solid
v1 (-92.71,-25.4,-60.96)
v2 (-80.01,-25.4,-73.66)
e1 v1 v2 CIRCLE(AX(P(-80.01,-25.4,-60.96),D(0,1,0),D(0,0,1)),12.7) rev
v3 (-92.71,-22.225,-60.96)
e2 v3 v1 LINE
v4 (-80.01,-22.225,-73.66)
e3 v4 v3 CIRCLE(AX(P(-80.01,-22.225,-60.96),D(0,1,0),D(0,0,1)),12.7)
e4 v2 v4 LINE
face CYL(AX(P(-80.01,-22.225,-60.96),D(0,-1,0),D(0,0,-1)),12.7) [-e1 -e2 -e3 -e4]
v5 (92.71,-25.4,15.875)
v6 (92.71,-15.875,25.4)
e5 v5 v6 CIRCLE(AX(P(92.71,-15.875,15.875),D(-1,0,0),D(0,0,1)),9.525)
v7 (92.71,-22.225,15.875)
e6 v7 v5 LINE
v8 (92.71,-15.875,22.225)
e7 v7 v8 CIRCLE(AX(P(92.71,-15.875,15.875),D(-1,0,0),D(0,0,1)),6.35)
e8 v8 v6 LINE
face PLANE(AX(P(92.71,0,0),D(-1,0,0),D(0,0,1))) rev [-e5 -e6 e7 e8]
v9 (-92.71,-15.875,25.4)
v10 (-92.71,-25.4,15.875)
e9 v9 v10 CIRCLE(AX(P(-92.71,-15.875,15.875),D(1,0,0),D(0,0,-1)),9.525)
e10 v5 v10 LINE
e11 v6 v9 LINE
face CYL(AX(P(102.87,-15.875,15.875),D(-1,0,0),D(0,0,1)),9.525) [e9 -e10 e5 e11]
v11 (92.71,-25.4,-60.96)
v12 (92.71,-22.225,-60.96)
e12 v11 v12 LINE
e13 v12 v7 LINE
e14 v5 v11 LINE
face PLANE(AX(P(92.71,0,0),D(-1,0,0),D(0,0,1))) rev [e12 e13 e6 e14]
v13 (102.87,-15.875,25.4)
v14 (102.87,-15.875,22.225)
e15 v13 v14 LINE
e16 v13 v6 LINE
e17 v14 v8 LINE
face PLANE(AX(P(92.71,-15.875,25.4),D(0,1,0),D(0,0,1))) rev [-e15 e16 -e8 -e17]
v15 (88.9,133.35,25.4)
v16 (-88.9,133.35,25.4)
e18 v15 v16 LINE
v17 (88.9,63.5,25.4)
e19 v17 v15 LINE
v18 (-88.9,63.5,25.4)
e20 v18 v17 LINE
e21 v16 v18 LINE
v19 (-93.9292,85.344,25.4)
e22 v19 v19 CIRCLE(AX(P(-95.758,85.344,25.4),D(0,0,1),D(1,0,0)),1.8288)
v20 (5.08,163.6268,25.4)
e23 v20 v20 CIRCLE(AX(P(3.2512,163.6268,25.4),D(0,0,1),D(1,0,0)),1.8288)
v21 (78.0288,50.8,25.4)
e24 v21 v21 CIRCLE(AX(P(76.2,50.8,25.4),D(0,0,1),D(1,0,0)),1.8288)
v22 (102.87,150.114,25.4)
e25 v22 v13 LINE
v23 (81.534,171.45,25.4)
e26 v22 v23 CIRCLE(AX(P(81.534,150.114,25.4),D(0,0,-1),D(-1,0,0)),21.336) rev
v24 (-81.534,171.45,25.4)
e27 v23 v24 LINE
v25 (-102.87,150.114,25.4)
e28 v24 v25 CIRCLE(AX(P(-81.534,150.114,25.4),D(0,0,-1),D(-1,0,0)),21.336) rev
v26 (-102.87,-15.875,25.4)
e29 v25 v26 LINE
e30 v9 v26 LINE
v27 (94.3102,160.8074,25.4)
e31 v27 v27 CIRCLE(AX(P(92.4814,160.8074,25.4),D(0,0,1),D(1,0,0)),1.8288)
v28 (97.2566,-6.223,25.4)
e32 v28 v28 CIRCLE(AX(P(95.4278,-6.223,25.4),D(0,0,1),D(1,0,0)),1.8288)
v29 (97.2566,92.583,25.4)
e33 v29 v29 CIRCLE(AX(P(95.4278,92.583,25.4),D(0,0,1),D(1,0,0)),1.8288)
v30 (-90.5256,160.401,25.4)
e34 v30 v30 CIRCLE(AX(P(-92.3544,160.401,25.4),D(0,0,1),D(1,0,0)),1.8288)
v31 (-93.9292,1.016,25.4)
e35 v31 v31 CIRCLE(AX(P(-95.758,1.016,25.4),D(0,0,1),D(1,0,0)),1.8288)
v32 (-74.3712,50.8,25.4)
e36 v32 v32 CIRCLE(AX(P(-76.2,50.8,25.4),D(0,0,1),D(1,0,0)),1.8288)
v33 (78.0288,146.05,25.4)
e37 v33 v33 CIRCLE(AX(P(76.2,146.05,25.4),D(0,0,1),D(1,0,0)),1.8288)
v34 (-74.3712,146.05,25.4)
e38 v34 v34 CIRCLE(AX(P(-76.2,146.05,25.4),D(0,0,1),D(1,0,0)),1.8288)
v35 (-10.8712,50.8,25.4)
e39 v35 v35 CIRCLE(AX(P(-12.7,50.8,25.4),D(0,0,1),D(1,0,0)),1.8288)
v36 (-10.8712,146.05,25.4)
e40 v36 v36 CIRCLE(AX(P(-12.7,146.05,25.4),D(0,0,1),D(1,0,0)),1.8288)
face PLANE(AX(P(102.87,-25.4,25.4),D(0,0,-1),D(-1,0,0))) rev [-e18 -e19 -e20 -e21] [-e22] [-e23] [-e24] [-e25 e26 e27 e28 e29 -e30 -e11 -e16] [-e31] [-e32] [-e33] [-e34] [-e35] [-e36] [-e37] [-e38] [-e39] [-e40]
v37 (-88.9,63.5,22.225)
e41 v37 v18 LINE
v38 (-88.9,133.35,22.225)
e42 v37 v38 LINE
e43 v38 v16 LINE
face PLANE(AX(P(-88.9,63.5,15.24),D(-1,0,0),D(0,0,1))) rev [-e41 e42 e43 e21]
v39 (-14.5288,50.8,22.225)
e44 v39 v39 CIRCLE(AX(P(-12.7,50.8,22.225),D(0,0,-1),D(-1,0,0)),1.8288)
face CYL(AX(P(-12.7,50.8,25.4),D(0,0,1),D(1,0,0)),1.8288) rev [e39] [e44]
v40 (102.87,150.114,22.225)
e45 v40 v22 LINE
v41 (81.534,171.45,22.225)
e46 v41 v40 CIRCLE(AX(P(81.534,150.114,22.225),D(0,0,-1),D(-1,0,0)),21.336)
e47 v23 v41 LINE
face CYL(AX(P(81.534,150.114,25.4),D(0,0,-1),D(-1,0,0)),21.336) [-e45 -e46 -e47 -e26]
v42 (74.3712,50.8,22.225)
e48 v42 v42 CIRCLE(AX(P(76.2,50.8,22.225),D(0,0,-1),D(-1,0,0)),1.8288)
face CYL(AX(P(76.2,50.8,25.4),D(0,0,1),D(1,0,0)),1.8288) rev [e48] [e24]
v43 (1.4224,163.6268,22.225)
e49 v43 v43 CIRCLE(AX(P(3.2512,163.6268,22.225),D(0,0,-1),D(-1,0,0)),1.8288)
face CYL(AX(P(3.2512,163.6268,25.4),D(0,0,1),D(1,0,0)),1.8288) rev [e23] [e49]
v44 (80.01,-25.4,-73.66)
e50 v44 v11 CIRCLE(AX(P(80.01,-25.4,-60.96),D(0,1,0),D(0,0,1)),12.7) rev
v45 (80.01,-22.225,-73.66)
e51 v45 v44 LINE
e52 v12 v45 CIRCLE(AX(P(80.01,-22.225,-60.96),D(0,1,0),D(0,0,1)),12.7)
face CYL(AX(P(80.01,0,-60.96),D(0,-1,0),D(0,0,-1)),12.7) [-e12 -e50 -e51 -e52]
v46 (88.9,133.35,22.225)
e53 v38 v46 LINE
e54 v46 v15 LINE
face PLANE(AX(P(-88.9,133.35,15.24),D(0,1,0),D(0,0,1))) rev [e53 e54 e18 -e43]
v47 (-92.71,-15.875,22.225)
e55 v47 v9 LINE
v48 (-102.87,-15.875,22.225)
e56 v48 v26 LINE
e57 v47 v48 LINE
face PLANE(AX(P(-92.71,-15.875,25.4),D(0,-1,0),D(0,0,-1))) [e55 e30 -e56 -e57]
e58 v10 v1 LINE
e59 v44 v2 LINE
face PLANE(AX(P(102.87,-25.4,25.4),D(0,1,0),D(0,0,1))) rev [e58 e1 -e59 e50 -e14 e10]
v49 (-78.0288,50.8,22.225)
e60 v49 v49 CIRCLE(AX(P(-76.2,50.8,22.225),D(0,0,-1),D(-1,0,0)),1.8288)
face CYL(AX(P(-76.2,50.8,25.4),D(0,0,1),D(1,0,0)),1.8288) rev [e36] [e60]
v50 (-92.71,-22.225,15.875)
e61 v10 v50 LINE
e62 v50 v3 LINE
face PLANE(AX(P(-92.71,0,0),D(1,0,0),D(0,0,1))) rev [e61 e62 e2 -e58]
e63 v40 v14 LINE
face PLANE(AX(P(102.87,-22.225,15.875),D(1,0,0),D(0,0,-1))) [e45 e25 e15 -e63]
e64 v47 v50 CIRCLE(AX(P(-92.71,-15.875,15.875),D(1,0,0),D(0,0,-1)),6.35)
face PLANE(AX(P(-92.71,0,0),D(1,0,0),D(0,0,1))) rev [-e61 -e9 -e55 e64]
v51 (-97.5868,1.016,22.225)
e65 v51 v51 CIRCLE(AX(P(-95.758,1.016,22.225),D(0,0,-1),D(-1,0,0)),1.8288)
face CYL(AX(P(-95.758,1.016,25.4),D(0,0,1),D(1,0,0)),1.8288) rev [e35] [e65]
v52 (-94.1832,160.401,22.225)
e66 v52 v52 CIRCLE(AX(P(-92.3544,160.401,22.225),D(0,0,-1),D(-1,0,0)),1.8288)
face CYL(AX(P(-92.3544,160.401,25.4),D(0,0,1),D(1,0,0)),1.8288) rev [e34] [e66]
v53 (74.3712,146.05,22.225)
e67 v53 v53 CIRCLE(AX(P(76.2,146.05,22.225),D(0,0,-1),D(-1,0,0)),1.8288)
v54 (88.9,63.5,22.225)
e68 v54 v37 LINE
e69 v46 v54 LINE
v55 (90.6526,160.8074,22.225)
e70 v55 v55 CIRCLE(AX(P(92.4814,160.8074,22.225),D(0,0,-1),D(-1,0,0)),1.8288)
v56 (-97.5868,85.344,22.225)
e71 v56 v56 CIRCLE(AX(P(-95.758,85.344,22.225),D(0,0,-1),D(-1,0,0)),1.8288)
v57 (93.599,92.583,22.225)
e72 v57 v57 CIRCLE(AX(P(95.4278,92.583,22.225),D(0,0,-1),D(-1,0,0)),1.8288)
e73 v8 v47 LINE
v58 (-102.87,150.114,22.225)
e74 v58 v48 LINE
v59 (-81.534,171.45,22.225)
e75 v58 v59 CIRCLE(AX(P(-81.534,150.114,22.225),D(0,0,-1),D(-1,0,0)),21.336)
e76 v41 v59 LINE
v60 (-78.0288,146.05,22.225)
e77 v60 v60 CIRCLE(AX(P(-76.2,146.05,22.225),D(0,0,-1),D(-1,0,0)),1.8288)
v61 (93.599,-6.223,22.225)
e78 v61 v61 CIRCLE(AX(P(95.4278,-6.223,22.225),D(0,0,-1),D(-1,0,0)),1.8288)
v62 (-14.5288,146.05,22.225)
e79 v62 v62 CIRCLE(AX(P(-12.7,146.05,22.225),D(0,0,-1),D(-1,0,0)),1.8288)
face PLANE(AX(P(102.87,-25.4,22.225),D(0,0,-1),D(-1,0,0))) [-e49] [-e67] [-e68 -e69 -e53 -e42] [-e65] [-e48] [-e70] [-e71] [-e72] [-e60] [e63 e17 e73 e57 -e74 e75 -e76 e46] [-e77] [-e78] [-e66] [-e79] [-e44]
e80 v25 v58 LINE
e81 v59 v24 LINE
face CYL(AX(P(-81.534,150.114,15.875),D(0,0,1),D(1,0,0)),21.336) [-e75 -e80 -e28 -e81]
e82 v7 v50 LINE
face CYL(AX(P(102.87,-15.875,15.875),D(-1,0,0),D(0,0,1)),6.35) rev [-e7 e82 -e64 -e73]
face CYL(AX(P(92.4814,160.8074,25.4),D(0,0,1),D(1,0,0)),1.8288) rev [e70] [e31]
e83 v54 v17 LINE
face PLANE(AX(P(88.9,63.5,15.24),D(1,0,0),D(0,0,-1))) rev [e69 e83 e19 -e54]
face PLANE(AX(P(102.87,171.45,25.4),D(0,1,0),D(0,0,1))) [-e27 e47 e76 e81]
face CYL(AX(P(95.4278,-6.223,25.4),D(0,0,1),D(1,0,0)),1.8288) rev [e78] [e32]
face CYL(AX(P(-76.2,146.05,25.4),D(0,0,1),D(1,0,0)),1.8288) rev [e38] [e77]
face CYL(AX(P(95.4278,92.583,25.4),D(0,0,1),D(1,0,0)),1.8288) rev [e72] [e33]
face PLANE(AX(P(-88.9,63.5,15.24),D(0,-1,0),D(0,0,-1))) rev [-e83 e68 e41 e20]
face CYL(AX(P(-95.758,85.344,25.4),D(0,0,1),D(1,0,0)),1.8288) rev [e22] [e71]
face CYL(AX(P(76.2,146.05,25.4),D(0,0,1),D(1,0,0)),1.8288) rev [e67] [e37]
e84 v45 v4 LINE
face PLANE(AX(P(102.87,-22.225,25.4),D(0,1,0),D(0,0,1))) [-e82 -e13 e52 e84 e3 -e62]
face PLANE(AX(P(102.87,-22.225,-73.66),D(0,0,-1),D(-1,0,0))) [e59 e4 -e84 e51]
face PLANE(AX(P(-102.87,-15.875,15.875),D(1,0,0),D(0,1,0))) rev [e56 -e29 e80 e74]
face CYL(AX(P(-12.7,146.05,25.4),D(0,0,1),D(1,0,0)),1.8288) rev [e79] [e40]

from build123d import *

# Parameters (mm, degrees)
BASE_FLANGE1_DEPTH          = 102.87
SKETCH6_W                   = 9.525
SKETCH6_H                   = 99.06
CUT_EXTRUDE1_DEPTH          = 10.16
FILLET1_R                   = 21.336
FILLET2_R                   = 12.7
SKETCH8_W                   = 177.8
SKETCH8_H                   = 69.85
CUT_EXTRUDE2_DEPTH          = 10.16
F_27_0_144_DIAMETER_HOLE1_D = 3.6576
F_27_0_144_DIAMETER_HOLE2_D = 3.6576


# Sheet-metal steps are written as plain solids
with BuildPart() as part:
    # Sketch1 → Base-Flange1 (new, symmetric)
    with BuildSketch(Plane.YZ):
        with BuildLine():
            Line((-25.4, -73.66), (-25.4, 15.875))
            ThreePointArc((-25.4, 15.875), (-22.610192091, 22.610192091), (-15.875, 25.4))
            Line((-15.875, 25.4), (171.45, 25.4))
            Line((171.45, 25.4), (171.45, 22.225))
            Line((171.45, 22.225), (-15.875, 22.225))
            ThreePointArc((-15.875, 22.225), (-20.365128061, 20.365128061), (-22.225, 15.875))
            Line((-22.225, 15.875), (-22.225, -73.66))
            Line((-22.225, -73.66), (-25.4, -73.66))
        make_face()
    extrude(amount=BASE_FLANGE1_DEPTH, both=True)

    # Sketch6 → Cut-Extrude1 (cut)
    with BuildSketch(Plane.YZ.offset(102.87)):
        with Locations((-20.6375, -24.13)):
            Rectangle(SKETCH6_W, SKETCH6_H)
    cut_extrude1 = extrude(amount=-CUT_EXTRUDE1_DEPTH, mode=Mode.SUBTRACT)

    # Mirror1: Cut-Extrude1 across plane
    add(cut_extrude1.mirror(Plane(origin=(0, 0, 0), x_dir=(0, 0, 1), z_dir=(1, 0, 0))), mode=Mode.SUBTRACT)

    # Fillet1
    fillet1_edges = [part.edges().sort_by_distance(p)[0] for p in [
        (102.87, 171.45, 23.8125),
        (-102.87, 171.45, 23.8125),
    ]]
    fillet(fillet1_edges, radius=FILLET1_R)

    # Fillet2
    fillet2_edges = [part.edges().sort_by_distance(p)[0] for p in [
        (92.71, -23.8125, -73.66),
        (-92.71, -23.8125, -73.66),
    ]]
    fillet(fillet2_edges, radius=FILLET2_R)

    # Sketch8 → Cut-Extrude2 (cut)
    with BuildSketch(Plane.XY.offset(25.4)):
        with Locations((0, 98.425)):
            Rectangle(SKETCH8_W, SKETCH8_H)
    extrude(amount=-CUT_EXTRUDE2_DEPTH, mode=Mode.SUBTRACT)

    # #27 (0.144) Diameter Hole1 (through all)
    with Locations(Plane.XY.offset(25.4)):
        with Locations((-76.2, 146.05), (-12.7, 146.05), (76.2, 146.05), (76.2, 50.8), (-12.7, 50.8), (-76.2, 50.8)):
            Hole(F_27_0_144_DIAMETER_HOLE1_D / 2)

    # #27 (0.144) Diameter Hole2 (through all)
    with Locations(Plane.XY.offset(25.4)):
        with Locations((92.4814, 160.8074), (95.4278, 92.583), (95.4278, -6.223), (-95.758, 1.016), (-95.758, 85.344), (-92.3544, 160.401), (3.2512, 163.6268)):
            Hole(F_27_0_144_DIAMETER_HOLE2_D / 2)


solid = part.part
